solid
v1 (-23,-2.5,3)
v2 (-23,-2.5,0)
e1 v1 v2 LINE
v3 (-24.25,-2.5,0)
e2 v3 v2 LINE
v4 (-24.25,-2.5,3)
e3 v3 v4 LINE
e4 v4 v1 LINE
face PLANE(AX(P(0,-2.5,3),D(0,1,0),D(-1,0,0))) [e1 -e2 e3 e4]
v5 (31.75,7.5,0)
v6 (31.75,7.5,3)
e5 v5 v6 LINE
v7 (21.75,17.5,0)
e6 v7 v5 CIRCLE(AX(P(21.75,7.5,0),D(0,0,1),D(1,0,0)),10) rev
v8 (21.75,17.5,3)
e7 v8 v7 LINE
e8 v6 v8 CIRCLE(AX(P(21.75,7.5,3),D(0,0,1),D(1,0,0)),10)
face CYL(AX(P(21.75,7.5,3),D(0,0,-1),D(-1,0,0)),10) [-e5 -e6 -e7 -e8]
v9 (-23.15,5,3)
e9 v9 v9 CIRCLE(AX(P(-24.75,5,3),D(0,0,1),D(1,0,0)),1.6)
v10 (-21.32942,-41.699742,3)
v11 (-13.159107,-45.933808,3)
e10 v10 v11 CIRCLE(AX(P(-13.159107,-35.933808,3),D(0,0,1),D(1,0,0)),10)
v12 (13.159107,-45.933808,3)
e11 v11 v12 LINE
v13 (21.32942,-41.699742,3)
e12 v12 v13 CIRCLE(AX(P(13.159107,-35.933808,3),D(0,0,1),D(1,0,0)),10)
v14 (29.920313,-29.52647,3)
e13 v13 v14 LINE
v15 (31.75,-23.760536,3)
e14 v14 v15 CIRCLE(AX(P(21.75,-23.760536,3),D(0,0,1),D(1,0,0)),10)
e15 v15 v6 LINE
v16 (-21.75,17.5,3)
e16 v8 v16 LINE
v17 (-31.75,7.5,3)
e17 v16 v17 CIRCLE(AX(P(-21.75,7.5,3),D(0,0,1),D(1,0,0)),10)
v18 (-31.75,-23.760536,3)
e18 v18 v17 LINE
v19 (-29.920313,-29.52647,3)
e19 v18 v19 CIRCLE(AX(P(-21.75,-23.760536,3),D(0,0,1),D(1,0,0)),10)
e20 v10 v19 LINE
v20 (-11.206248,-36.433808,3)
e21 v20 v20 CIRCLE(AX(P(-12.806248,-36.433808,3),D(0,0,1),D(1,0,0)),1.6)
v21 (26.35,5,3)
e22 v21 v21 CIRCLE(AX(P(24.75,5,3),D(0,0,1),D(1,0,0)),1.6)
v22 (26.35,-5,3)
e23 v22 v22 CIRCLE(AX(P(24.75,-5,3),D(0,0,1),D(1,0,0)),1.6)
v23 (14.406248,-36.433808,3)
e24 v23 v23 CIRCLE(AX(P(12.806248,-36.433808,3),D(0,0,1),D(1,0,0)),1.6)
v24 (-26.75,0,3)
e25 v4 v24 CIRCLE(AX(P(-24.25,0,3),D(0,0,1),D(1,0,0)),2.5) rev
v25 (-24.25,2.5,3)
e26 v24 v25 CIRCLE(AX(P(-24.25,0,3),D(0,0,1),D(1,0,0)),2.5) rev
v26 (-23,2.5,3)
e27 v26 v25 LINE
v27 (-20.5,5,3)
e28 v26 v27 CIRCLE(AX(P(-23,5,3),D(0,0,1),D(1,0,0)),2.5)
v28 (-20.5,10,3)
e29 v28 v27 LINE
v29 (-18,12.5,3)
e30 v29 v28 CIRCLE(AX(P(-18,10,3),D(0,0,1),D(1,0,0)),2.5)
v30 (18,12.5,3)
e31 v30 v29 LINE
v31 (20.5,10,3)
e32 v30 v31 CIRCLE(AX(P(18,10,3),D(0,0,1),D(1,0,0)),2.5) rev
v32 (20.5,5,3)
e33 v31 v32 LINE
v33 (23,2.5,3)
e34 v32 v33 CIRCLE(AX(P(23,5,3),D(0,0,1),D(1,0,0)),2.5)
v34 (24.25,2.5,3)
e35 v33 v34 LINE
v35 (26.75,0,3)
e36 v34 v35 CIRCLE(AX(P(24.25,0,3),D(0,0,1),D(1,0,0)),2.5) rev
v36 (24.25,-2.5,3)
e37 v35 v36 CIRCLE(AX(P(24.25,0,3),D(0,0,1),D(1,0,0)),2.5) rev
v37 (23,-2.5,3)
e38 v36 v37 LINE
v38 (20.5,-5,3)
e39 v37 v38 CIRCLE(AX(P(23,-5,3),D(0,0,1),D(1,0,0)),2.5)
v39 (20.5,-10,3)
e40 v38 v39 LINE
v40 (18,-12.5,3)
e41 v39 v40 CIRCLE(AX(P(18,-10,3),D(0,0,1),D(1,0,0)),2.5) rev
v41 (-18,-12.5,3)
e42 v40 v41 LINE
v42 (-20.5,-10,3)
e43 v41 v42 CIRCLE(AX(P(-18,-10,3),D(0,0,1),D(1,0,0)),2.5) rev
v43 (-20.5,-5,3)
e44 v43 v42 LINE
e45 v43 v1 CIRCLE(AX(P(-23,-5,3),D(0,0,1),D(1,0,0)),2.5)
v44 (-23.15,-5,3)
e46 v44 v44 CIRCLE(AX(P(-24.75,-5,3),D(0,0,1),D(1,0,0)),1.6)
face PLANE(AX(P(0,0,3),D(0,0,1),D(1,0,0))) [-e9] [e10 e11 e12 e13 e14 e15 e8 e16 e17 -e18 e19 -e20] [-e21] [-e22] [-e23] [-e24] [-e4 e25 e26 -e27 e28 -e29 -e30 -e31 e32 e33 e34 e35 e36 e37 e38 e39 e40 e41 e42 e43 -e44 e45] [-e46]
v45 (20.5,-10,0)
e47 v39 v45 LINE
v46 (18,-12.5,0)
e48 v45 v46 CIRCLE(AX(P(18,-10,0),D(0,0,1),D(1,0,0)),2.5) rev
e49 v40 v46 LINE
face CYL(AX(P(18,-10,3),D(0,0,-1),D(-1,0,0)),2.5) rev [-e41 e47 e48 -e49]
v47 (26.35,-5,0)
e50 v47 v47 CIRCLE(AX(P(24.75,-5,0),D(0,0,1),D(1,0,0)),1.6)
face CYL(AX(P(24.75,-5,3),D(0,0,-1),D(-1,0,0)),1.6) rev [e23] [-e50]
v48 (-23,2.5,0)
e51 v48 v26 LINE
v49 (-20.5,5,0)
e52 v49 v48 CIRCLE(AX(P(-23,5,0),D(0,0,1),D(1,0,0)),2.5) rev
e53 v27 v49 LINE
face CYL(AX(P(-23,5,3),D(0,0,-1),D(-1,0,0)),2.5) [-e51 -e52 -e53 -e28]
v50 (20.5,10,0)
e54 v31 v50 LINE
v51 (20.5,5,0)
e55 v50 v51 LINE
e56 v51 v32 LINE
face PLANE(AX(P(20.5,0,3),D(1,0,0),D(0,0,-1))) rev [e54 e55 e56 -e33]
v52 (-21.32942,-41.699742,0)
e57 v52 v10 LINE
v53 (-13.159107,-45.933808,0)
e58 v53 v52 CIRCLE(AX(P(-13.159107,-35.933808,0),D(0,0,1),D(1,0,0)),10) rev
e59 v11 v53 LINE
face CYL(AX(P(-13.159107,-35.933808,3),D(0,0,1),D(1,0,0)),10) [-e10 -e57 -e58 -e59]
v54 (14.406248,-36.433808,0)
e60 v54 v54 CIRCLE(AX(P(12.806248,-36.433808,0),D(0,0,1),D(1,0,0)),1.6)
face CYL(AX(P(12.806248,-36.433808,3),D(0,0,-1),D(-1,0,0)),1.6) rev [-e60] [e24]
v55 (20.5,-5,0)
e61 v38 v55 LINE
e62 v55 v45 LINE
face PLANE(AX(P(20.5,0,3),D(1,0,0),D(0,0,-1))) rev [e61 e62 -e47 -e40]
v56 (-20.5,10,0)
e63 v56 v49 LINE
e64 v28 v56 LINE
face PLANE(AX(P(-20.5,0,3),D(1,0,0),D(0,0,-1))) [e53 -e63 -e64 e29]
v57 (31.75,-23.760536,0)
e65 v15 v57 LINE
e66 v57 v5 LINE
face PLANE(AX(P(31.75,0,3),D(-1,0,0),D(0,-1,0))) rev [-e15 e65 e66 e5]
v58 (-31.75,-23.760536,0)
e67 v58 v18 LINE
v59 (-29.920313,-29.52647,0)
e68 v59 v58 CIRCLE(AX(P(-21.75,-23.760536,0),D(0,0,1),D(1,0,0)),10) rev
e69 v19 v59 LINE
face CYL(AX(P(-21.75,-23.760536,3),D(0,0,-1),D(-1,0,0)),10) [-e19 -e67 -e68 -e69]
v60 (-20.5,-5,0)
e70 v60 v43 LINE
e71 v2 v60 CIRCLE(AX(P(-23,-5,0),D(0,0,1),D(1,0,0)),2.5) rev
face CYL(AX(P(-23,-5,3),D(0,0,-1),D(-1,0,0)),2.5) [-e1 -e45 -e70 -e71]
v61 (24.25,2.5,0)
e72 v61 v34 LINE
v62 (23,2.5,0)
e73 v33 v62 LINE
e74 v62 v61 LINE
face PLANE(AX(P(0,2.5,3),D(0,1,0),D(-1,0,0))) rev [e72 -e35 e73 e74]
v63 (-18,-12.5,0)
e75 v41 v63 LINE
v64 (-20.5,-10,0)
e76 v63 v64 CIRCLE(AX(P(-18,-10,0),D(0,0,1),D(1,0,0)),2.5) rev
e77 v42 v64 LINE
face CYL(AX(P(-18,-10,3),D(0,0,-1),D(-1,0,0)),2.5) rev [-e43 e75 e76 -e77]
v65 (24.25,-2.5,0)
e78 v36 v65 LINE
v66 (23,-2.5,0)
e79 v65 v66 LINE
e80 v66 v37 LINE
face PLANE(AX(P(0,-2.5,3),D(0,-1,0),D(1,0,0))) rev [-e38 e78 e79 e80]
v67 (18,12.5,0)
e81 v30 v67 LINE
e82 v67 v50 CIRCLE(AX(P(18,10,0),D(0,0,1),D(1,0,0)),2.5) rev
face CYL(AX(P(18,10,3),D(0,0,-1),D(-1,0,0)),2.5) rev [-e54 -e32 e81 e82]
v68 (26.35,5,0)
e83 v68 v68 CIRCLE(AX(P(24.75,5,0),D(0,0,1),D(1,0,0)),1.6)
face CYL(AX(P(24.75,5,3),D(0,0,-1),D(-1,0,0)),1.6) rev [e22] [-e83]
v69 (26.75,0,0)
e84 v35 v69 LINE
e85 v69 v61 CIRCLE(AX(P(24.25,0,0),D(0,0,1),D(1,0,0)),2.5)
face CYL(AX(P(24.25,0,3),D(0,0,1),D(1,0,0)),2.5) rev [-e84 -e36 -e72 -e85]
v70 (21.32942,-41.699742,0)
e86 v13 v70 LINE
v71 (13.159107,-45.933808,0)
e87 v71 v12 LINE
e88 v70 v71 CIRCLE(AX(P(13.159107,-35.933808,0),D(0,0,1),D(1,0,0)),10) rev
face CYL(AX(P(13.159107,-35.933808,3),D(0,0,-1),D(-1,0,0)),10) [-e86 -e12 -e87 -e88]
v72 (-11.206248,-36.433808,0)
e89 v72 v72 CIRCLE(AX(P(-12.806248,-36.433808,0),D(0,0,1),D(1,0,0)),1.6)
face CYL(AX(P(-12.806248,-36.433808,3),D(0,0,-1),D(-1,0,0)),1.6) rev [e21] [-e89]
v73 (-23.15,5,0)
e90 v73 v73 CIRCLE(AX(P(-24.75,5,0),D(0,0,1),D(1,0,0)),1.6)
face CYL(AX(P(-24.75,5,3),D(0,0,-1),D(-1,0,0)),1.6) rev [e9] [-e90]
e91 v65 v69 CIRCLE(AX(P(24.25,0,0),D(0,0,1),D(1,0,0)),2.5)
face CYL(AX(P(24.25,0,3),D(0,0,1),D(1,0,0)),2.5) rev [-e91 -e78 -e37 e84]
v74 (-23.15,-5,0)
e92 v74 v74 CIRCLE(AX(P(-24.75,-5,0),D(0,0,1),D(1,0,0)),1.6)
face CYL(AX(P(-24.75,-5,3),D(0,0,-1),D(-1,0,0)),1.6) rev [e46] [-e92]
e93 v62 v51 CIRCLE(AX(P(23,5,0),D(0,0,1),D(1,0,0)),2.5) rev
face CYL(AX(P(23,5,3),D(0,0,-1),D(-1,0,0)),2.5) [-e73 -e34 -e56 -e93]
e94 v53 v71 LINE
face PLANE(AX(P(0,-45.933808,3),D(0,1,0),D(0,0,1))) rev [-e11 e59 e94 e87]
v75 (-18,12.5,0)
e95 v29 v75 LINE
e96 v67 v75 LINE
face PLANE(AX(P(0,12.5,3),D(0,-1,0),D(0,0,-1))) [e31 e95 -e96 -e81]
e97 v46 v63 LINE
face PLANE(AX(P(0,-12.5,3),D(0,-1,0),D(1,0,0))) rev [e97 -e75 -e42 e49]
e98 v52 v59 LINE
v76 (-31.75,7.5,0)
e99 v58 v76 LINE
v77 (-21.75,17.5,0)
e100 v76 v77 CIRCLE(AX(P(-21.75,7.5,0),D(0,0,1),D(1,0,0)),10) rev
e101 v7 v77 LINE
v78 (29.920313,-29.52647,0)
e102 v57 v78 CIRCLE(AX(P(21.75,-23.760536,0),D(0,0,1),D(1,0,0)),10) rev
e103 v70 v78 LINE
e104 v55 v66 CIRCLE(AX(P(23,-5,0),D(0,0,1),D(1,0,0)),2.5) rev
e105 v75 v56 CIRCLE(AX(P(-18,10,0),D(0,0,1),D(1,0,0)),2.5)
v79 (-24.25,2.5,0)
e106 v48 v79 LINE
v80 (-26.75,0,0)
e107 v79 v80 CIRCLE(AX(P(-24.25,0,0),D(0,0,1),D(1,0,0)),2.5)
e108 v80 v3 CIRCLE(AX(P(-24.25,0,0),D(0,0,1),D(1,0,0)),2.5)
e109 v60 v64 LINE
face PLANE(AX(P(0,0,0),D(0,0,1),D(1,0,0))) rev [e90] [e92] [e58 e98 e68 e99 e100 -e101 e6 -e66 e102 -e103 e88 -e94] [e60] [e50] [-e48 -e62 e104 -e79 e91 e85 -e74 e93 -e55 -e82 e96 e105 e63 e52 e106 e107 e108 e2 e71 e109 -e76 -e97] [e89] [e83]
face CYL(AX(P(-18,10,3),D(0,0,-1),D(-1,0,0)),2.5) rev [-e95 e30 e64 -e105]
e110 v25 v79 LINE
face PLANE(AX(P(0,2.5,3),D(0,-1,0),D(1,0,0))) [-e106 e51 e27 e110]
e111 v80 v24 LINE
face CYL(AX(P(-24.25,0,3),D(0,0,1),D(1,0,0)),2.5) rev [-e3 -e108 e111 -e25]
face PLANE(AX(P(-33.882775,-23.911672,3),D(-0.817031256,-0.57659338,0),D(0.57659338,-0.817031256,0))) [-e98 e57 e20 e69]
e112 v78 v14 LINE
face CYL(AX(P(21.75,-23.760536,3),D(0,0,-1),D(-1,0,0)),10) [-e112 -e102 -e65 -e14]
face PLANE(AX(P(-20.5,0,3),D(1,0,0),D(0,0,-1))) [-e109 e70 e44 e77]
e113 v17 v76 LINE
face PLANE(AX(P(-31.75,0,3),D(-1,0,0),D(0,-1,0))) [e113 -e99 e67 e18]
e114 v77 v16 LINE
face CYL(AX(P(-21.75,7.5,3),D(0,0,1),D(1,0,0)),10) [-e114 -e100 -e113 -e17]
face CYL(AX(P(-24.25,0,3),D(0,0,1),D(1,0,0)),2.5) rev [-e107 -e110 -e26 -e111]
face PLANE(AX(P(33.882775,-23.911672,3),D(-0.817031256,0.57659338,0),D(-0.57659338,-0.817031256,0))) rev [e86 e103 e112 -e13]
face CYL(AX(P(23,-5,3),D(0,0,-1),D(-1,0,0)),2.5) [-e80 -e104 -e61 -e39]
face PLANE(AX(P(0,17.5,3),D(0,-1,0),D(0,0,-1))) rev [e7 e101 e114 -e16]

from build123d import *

# Parameters (mm, degrees)
ESBO_O1_R                = 1.6
RESSALTO_EXTRUS_O1_DEPTH = 3
FILETE1_R                = 10
FILETE2_START            = -1
FILETE2_DEPTH            = 5
FILETE2_2_DEPTH          = 3


with BuildPart() as part:
    # Esboço1 → Ressalto-extrusão1 (new body)
    with BuildSketch(Plane.XY):
        Polygon((-31.75, -26.93380815), (-18.341364608, -45.93380815), (18.341364608, -45.93380815), (31.75, -26.93380815), (31.75, 17.5), (-31.75, 17.5), align=None)
        with Locations((-12.806248475, -36.43380815)):
            Circle(ESBO_O1_R, mode=Mode.SUBTRACT)
        with Locations((12.806248475, -36.43380815)):
            Circle(ESBO_O1_R, mode=Mode.SUBTRACT)
        with Locations((-24.75, -5)):
            Circle(ESBO_O1_R, mode=Mode.SUBTRACT)
        with Locations((-24.75, 5)):
            Circle(ESBO_O1_R, mode=Mode.SUBTRACT)
        with BuildLine():
            Line((-18, 12.5), (18, 12.5))
            ThreePointArc((18, 12.5), (19.767766953, 11.767766953), (20.5, 10))
            Line((20.5, 10), (20.5, 2.5))
            Line((20.5, 2.5), (26.75, 2.5))
            Line((26.75, 2.5), (26.75, -2.5))
            Line((26.75, -2.5), (20.5, -2.5))
            Line((20.5, -2.5), (20.5, -10))
            ThreePointArc((20.5, -10), (19.767766953, -11.767766953), (18, -12.5))
            Line((18, -12.5), (-18, -12.5))
            ThreePointArc((-18, -12.5), (-19.767766953, -11.767766953), (-20.5, -10))
            Line((-20.5, -10), (-20.5, -2.5))
            Line((-20.5, -2.5), (-26.75, -2.5))
            Line((-26.75, -2.5), (-26.75, 2.5))
            Line((-26.75, 2.5), (-20.5, 2.5))
            Line((-20.5, 2.5), (-20.5, 10))
            ThreePointArc((-20.5, 10), (-19.767766953, 11.767766953), (-18, 12.5))
        make_face(mode=Mode.SUBTRACT)
        with Locations((24.75, -5)):
            Circle(ESBO_O1_R, mode=Mode.SUBTRACT)
        with Locations((24.75, 5)):
            Circle(ESBO_O1_R, mode=Mode.SUBTRACT)
    extrude(amount=RESSALTO_EXTRUS_O1_DEPTH)

    # Filete1
    filete1_edges = [part.edges().sort_by_distance(p)[0] for p in [
        (-31.75, 17.5, 1.5),
        (31.75, 17.5, 1.5),
        (31.75, -26.93380815, 1.5),
        (18.341364608, -45.93380815, 1.5),
        (-18.341364608, -45.93380815, 1.5),
        (-31.75, -26.93380815, 1.5),
    ]]
    fillet(filete1_edges, radius=FILETE1_R)

    # Filete2: read off the stored shape, not the designer's step
    # Filete2 outline → Filete2 (cut)
    with BuildSketch(Plane.XY.offset(FILETE2_START)):
        with BuildLine():
            Line((-20.5, -2.5), (-23, -2.5))
            ThreePointArc((-23, -2.5), (-21.232233047, -3.232233047), (-20.5, -5))
            Line((-20.5, -5), (-20.5, -2.5))
        make_face()
        with BuildLine():
            ThreePointArc((-20.5, 5), (-21.232233047, 3.232233047), (-23, 2.5))
            Line((-23, 2.5), (-20.5, 2.5))
            Line((-20.5, 2.5), (-20.5, 5))
        make_face()
        with BuildLine():
            Line((20.5, -2.5), (20.5, -5))
            ThreePointArc((20.5, -5), (21.232233047, -3.232233047), (23, -2.5))
            Line((23, -2.5), (20.5, -2.5))
        make_face()
        with BuildLine():
            Line((20.5, 2.5), (23, 2.5))
            ThreePointArc((23, 2.5), (21.232233047, 3.232233047), (20.5, 5))
            Line((20.5, 5), (20.5, 2.5))
        make_face()
    extrude(amount=FILETE2_DEPTH, mode=Mode.SUBTRACT)

    # Filete2 2 outline → Filete2 2 (add)
    with BuildSketch(Plane.XY):
        with BuildLine():
            ThreePointArc((-24.25, -2.5), (-26.017766953, -1.767766953), (-26.75, 0))
            Line((-26.75, 0), (-26.75, -2.5))
            Line((-26.75, -2.5), (-24.25, -2.5))
        make_face()
        with BuildLine():
            ThreePointArc((-26.75, 0), (-26.017766953, 1.767766953), (-24.25, 2.5))
            Line((-24.25, 2.5), (-26.75, 2.5))
            Line((-26.75, 2.5), (-26.75, 0))
        make_face()
        with BuildLine():
            ThreePointArc((24.25, 2.5), (26.017766953, 1.767766953), (26.75, 0))
            Line((26.75, 0), (26.75, 2.5))
            Line((26.75, 2.5), (24.25, 2.5))
        make_face()
        with BuildLine():
            ThreePointArc((26.75, 0), (26.017766953, -1.767766953), (24.25, -2.5))
            Line((24.25, -2.5), (26.75, -2.5))
            Line((26.75, -2.5), (26.75, 0))
        make_face()
    extrude(amount=FILETE2_2_DEPTH)


solid = part.part
